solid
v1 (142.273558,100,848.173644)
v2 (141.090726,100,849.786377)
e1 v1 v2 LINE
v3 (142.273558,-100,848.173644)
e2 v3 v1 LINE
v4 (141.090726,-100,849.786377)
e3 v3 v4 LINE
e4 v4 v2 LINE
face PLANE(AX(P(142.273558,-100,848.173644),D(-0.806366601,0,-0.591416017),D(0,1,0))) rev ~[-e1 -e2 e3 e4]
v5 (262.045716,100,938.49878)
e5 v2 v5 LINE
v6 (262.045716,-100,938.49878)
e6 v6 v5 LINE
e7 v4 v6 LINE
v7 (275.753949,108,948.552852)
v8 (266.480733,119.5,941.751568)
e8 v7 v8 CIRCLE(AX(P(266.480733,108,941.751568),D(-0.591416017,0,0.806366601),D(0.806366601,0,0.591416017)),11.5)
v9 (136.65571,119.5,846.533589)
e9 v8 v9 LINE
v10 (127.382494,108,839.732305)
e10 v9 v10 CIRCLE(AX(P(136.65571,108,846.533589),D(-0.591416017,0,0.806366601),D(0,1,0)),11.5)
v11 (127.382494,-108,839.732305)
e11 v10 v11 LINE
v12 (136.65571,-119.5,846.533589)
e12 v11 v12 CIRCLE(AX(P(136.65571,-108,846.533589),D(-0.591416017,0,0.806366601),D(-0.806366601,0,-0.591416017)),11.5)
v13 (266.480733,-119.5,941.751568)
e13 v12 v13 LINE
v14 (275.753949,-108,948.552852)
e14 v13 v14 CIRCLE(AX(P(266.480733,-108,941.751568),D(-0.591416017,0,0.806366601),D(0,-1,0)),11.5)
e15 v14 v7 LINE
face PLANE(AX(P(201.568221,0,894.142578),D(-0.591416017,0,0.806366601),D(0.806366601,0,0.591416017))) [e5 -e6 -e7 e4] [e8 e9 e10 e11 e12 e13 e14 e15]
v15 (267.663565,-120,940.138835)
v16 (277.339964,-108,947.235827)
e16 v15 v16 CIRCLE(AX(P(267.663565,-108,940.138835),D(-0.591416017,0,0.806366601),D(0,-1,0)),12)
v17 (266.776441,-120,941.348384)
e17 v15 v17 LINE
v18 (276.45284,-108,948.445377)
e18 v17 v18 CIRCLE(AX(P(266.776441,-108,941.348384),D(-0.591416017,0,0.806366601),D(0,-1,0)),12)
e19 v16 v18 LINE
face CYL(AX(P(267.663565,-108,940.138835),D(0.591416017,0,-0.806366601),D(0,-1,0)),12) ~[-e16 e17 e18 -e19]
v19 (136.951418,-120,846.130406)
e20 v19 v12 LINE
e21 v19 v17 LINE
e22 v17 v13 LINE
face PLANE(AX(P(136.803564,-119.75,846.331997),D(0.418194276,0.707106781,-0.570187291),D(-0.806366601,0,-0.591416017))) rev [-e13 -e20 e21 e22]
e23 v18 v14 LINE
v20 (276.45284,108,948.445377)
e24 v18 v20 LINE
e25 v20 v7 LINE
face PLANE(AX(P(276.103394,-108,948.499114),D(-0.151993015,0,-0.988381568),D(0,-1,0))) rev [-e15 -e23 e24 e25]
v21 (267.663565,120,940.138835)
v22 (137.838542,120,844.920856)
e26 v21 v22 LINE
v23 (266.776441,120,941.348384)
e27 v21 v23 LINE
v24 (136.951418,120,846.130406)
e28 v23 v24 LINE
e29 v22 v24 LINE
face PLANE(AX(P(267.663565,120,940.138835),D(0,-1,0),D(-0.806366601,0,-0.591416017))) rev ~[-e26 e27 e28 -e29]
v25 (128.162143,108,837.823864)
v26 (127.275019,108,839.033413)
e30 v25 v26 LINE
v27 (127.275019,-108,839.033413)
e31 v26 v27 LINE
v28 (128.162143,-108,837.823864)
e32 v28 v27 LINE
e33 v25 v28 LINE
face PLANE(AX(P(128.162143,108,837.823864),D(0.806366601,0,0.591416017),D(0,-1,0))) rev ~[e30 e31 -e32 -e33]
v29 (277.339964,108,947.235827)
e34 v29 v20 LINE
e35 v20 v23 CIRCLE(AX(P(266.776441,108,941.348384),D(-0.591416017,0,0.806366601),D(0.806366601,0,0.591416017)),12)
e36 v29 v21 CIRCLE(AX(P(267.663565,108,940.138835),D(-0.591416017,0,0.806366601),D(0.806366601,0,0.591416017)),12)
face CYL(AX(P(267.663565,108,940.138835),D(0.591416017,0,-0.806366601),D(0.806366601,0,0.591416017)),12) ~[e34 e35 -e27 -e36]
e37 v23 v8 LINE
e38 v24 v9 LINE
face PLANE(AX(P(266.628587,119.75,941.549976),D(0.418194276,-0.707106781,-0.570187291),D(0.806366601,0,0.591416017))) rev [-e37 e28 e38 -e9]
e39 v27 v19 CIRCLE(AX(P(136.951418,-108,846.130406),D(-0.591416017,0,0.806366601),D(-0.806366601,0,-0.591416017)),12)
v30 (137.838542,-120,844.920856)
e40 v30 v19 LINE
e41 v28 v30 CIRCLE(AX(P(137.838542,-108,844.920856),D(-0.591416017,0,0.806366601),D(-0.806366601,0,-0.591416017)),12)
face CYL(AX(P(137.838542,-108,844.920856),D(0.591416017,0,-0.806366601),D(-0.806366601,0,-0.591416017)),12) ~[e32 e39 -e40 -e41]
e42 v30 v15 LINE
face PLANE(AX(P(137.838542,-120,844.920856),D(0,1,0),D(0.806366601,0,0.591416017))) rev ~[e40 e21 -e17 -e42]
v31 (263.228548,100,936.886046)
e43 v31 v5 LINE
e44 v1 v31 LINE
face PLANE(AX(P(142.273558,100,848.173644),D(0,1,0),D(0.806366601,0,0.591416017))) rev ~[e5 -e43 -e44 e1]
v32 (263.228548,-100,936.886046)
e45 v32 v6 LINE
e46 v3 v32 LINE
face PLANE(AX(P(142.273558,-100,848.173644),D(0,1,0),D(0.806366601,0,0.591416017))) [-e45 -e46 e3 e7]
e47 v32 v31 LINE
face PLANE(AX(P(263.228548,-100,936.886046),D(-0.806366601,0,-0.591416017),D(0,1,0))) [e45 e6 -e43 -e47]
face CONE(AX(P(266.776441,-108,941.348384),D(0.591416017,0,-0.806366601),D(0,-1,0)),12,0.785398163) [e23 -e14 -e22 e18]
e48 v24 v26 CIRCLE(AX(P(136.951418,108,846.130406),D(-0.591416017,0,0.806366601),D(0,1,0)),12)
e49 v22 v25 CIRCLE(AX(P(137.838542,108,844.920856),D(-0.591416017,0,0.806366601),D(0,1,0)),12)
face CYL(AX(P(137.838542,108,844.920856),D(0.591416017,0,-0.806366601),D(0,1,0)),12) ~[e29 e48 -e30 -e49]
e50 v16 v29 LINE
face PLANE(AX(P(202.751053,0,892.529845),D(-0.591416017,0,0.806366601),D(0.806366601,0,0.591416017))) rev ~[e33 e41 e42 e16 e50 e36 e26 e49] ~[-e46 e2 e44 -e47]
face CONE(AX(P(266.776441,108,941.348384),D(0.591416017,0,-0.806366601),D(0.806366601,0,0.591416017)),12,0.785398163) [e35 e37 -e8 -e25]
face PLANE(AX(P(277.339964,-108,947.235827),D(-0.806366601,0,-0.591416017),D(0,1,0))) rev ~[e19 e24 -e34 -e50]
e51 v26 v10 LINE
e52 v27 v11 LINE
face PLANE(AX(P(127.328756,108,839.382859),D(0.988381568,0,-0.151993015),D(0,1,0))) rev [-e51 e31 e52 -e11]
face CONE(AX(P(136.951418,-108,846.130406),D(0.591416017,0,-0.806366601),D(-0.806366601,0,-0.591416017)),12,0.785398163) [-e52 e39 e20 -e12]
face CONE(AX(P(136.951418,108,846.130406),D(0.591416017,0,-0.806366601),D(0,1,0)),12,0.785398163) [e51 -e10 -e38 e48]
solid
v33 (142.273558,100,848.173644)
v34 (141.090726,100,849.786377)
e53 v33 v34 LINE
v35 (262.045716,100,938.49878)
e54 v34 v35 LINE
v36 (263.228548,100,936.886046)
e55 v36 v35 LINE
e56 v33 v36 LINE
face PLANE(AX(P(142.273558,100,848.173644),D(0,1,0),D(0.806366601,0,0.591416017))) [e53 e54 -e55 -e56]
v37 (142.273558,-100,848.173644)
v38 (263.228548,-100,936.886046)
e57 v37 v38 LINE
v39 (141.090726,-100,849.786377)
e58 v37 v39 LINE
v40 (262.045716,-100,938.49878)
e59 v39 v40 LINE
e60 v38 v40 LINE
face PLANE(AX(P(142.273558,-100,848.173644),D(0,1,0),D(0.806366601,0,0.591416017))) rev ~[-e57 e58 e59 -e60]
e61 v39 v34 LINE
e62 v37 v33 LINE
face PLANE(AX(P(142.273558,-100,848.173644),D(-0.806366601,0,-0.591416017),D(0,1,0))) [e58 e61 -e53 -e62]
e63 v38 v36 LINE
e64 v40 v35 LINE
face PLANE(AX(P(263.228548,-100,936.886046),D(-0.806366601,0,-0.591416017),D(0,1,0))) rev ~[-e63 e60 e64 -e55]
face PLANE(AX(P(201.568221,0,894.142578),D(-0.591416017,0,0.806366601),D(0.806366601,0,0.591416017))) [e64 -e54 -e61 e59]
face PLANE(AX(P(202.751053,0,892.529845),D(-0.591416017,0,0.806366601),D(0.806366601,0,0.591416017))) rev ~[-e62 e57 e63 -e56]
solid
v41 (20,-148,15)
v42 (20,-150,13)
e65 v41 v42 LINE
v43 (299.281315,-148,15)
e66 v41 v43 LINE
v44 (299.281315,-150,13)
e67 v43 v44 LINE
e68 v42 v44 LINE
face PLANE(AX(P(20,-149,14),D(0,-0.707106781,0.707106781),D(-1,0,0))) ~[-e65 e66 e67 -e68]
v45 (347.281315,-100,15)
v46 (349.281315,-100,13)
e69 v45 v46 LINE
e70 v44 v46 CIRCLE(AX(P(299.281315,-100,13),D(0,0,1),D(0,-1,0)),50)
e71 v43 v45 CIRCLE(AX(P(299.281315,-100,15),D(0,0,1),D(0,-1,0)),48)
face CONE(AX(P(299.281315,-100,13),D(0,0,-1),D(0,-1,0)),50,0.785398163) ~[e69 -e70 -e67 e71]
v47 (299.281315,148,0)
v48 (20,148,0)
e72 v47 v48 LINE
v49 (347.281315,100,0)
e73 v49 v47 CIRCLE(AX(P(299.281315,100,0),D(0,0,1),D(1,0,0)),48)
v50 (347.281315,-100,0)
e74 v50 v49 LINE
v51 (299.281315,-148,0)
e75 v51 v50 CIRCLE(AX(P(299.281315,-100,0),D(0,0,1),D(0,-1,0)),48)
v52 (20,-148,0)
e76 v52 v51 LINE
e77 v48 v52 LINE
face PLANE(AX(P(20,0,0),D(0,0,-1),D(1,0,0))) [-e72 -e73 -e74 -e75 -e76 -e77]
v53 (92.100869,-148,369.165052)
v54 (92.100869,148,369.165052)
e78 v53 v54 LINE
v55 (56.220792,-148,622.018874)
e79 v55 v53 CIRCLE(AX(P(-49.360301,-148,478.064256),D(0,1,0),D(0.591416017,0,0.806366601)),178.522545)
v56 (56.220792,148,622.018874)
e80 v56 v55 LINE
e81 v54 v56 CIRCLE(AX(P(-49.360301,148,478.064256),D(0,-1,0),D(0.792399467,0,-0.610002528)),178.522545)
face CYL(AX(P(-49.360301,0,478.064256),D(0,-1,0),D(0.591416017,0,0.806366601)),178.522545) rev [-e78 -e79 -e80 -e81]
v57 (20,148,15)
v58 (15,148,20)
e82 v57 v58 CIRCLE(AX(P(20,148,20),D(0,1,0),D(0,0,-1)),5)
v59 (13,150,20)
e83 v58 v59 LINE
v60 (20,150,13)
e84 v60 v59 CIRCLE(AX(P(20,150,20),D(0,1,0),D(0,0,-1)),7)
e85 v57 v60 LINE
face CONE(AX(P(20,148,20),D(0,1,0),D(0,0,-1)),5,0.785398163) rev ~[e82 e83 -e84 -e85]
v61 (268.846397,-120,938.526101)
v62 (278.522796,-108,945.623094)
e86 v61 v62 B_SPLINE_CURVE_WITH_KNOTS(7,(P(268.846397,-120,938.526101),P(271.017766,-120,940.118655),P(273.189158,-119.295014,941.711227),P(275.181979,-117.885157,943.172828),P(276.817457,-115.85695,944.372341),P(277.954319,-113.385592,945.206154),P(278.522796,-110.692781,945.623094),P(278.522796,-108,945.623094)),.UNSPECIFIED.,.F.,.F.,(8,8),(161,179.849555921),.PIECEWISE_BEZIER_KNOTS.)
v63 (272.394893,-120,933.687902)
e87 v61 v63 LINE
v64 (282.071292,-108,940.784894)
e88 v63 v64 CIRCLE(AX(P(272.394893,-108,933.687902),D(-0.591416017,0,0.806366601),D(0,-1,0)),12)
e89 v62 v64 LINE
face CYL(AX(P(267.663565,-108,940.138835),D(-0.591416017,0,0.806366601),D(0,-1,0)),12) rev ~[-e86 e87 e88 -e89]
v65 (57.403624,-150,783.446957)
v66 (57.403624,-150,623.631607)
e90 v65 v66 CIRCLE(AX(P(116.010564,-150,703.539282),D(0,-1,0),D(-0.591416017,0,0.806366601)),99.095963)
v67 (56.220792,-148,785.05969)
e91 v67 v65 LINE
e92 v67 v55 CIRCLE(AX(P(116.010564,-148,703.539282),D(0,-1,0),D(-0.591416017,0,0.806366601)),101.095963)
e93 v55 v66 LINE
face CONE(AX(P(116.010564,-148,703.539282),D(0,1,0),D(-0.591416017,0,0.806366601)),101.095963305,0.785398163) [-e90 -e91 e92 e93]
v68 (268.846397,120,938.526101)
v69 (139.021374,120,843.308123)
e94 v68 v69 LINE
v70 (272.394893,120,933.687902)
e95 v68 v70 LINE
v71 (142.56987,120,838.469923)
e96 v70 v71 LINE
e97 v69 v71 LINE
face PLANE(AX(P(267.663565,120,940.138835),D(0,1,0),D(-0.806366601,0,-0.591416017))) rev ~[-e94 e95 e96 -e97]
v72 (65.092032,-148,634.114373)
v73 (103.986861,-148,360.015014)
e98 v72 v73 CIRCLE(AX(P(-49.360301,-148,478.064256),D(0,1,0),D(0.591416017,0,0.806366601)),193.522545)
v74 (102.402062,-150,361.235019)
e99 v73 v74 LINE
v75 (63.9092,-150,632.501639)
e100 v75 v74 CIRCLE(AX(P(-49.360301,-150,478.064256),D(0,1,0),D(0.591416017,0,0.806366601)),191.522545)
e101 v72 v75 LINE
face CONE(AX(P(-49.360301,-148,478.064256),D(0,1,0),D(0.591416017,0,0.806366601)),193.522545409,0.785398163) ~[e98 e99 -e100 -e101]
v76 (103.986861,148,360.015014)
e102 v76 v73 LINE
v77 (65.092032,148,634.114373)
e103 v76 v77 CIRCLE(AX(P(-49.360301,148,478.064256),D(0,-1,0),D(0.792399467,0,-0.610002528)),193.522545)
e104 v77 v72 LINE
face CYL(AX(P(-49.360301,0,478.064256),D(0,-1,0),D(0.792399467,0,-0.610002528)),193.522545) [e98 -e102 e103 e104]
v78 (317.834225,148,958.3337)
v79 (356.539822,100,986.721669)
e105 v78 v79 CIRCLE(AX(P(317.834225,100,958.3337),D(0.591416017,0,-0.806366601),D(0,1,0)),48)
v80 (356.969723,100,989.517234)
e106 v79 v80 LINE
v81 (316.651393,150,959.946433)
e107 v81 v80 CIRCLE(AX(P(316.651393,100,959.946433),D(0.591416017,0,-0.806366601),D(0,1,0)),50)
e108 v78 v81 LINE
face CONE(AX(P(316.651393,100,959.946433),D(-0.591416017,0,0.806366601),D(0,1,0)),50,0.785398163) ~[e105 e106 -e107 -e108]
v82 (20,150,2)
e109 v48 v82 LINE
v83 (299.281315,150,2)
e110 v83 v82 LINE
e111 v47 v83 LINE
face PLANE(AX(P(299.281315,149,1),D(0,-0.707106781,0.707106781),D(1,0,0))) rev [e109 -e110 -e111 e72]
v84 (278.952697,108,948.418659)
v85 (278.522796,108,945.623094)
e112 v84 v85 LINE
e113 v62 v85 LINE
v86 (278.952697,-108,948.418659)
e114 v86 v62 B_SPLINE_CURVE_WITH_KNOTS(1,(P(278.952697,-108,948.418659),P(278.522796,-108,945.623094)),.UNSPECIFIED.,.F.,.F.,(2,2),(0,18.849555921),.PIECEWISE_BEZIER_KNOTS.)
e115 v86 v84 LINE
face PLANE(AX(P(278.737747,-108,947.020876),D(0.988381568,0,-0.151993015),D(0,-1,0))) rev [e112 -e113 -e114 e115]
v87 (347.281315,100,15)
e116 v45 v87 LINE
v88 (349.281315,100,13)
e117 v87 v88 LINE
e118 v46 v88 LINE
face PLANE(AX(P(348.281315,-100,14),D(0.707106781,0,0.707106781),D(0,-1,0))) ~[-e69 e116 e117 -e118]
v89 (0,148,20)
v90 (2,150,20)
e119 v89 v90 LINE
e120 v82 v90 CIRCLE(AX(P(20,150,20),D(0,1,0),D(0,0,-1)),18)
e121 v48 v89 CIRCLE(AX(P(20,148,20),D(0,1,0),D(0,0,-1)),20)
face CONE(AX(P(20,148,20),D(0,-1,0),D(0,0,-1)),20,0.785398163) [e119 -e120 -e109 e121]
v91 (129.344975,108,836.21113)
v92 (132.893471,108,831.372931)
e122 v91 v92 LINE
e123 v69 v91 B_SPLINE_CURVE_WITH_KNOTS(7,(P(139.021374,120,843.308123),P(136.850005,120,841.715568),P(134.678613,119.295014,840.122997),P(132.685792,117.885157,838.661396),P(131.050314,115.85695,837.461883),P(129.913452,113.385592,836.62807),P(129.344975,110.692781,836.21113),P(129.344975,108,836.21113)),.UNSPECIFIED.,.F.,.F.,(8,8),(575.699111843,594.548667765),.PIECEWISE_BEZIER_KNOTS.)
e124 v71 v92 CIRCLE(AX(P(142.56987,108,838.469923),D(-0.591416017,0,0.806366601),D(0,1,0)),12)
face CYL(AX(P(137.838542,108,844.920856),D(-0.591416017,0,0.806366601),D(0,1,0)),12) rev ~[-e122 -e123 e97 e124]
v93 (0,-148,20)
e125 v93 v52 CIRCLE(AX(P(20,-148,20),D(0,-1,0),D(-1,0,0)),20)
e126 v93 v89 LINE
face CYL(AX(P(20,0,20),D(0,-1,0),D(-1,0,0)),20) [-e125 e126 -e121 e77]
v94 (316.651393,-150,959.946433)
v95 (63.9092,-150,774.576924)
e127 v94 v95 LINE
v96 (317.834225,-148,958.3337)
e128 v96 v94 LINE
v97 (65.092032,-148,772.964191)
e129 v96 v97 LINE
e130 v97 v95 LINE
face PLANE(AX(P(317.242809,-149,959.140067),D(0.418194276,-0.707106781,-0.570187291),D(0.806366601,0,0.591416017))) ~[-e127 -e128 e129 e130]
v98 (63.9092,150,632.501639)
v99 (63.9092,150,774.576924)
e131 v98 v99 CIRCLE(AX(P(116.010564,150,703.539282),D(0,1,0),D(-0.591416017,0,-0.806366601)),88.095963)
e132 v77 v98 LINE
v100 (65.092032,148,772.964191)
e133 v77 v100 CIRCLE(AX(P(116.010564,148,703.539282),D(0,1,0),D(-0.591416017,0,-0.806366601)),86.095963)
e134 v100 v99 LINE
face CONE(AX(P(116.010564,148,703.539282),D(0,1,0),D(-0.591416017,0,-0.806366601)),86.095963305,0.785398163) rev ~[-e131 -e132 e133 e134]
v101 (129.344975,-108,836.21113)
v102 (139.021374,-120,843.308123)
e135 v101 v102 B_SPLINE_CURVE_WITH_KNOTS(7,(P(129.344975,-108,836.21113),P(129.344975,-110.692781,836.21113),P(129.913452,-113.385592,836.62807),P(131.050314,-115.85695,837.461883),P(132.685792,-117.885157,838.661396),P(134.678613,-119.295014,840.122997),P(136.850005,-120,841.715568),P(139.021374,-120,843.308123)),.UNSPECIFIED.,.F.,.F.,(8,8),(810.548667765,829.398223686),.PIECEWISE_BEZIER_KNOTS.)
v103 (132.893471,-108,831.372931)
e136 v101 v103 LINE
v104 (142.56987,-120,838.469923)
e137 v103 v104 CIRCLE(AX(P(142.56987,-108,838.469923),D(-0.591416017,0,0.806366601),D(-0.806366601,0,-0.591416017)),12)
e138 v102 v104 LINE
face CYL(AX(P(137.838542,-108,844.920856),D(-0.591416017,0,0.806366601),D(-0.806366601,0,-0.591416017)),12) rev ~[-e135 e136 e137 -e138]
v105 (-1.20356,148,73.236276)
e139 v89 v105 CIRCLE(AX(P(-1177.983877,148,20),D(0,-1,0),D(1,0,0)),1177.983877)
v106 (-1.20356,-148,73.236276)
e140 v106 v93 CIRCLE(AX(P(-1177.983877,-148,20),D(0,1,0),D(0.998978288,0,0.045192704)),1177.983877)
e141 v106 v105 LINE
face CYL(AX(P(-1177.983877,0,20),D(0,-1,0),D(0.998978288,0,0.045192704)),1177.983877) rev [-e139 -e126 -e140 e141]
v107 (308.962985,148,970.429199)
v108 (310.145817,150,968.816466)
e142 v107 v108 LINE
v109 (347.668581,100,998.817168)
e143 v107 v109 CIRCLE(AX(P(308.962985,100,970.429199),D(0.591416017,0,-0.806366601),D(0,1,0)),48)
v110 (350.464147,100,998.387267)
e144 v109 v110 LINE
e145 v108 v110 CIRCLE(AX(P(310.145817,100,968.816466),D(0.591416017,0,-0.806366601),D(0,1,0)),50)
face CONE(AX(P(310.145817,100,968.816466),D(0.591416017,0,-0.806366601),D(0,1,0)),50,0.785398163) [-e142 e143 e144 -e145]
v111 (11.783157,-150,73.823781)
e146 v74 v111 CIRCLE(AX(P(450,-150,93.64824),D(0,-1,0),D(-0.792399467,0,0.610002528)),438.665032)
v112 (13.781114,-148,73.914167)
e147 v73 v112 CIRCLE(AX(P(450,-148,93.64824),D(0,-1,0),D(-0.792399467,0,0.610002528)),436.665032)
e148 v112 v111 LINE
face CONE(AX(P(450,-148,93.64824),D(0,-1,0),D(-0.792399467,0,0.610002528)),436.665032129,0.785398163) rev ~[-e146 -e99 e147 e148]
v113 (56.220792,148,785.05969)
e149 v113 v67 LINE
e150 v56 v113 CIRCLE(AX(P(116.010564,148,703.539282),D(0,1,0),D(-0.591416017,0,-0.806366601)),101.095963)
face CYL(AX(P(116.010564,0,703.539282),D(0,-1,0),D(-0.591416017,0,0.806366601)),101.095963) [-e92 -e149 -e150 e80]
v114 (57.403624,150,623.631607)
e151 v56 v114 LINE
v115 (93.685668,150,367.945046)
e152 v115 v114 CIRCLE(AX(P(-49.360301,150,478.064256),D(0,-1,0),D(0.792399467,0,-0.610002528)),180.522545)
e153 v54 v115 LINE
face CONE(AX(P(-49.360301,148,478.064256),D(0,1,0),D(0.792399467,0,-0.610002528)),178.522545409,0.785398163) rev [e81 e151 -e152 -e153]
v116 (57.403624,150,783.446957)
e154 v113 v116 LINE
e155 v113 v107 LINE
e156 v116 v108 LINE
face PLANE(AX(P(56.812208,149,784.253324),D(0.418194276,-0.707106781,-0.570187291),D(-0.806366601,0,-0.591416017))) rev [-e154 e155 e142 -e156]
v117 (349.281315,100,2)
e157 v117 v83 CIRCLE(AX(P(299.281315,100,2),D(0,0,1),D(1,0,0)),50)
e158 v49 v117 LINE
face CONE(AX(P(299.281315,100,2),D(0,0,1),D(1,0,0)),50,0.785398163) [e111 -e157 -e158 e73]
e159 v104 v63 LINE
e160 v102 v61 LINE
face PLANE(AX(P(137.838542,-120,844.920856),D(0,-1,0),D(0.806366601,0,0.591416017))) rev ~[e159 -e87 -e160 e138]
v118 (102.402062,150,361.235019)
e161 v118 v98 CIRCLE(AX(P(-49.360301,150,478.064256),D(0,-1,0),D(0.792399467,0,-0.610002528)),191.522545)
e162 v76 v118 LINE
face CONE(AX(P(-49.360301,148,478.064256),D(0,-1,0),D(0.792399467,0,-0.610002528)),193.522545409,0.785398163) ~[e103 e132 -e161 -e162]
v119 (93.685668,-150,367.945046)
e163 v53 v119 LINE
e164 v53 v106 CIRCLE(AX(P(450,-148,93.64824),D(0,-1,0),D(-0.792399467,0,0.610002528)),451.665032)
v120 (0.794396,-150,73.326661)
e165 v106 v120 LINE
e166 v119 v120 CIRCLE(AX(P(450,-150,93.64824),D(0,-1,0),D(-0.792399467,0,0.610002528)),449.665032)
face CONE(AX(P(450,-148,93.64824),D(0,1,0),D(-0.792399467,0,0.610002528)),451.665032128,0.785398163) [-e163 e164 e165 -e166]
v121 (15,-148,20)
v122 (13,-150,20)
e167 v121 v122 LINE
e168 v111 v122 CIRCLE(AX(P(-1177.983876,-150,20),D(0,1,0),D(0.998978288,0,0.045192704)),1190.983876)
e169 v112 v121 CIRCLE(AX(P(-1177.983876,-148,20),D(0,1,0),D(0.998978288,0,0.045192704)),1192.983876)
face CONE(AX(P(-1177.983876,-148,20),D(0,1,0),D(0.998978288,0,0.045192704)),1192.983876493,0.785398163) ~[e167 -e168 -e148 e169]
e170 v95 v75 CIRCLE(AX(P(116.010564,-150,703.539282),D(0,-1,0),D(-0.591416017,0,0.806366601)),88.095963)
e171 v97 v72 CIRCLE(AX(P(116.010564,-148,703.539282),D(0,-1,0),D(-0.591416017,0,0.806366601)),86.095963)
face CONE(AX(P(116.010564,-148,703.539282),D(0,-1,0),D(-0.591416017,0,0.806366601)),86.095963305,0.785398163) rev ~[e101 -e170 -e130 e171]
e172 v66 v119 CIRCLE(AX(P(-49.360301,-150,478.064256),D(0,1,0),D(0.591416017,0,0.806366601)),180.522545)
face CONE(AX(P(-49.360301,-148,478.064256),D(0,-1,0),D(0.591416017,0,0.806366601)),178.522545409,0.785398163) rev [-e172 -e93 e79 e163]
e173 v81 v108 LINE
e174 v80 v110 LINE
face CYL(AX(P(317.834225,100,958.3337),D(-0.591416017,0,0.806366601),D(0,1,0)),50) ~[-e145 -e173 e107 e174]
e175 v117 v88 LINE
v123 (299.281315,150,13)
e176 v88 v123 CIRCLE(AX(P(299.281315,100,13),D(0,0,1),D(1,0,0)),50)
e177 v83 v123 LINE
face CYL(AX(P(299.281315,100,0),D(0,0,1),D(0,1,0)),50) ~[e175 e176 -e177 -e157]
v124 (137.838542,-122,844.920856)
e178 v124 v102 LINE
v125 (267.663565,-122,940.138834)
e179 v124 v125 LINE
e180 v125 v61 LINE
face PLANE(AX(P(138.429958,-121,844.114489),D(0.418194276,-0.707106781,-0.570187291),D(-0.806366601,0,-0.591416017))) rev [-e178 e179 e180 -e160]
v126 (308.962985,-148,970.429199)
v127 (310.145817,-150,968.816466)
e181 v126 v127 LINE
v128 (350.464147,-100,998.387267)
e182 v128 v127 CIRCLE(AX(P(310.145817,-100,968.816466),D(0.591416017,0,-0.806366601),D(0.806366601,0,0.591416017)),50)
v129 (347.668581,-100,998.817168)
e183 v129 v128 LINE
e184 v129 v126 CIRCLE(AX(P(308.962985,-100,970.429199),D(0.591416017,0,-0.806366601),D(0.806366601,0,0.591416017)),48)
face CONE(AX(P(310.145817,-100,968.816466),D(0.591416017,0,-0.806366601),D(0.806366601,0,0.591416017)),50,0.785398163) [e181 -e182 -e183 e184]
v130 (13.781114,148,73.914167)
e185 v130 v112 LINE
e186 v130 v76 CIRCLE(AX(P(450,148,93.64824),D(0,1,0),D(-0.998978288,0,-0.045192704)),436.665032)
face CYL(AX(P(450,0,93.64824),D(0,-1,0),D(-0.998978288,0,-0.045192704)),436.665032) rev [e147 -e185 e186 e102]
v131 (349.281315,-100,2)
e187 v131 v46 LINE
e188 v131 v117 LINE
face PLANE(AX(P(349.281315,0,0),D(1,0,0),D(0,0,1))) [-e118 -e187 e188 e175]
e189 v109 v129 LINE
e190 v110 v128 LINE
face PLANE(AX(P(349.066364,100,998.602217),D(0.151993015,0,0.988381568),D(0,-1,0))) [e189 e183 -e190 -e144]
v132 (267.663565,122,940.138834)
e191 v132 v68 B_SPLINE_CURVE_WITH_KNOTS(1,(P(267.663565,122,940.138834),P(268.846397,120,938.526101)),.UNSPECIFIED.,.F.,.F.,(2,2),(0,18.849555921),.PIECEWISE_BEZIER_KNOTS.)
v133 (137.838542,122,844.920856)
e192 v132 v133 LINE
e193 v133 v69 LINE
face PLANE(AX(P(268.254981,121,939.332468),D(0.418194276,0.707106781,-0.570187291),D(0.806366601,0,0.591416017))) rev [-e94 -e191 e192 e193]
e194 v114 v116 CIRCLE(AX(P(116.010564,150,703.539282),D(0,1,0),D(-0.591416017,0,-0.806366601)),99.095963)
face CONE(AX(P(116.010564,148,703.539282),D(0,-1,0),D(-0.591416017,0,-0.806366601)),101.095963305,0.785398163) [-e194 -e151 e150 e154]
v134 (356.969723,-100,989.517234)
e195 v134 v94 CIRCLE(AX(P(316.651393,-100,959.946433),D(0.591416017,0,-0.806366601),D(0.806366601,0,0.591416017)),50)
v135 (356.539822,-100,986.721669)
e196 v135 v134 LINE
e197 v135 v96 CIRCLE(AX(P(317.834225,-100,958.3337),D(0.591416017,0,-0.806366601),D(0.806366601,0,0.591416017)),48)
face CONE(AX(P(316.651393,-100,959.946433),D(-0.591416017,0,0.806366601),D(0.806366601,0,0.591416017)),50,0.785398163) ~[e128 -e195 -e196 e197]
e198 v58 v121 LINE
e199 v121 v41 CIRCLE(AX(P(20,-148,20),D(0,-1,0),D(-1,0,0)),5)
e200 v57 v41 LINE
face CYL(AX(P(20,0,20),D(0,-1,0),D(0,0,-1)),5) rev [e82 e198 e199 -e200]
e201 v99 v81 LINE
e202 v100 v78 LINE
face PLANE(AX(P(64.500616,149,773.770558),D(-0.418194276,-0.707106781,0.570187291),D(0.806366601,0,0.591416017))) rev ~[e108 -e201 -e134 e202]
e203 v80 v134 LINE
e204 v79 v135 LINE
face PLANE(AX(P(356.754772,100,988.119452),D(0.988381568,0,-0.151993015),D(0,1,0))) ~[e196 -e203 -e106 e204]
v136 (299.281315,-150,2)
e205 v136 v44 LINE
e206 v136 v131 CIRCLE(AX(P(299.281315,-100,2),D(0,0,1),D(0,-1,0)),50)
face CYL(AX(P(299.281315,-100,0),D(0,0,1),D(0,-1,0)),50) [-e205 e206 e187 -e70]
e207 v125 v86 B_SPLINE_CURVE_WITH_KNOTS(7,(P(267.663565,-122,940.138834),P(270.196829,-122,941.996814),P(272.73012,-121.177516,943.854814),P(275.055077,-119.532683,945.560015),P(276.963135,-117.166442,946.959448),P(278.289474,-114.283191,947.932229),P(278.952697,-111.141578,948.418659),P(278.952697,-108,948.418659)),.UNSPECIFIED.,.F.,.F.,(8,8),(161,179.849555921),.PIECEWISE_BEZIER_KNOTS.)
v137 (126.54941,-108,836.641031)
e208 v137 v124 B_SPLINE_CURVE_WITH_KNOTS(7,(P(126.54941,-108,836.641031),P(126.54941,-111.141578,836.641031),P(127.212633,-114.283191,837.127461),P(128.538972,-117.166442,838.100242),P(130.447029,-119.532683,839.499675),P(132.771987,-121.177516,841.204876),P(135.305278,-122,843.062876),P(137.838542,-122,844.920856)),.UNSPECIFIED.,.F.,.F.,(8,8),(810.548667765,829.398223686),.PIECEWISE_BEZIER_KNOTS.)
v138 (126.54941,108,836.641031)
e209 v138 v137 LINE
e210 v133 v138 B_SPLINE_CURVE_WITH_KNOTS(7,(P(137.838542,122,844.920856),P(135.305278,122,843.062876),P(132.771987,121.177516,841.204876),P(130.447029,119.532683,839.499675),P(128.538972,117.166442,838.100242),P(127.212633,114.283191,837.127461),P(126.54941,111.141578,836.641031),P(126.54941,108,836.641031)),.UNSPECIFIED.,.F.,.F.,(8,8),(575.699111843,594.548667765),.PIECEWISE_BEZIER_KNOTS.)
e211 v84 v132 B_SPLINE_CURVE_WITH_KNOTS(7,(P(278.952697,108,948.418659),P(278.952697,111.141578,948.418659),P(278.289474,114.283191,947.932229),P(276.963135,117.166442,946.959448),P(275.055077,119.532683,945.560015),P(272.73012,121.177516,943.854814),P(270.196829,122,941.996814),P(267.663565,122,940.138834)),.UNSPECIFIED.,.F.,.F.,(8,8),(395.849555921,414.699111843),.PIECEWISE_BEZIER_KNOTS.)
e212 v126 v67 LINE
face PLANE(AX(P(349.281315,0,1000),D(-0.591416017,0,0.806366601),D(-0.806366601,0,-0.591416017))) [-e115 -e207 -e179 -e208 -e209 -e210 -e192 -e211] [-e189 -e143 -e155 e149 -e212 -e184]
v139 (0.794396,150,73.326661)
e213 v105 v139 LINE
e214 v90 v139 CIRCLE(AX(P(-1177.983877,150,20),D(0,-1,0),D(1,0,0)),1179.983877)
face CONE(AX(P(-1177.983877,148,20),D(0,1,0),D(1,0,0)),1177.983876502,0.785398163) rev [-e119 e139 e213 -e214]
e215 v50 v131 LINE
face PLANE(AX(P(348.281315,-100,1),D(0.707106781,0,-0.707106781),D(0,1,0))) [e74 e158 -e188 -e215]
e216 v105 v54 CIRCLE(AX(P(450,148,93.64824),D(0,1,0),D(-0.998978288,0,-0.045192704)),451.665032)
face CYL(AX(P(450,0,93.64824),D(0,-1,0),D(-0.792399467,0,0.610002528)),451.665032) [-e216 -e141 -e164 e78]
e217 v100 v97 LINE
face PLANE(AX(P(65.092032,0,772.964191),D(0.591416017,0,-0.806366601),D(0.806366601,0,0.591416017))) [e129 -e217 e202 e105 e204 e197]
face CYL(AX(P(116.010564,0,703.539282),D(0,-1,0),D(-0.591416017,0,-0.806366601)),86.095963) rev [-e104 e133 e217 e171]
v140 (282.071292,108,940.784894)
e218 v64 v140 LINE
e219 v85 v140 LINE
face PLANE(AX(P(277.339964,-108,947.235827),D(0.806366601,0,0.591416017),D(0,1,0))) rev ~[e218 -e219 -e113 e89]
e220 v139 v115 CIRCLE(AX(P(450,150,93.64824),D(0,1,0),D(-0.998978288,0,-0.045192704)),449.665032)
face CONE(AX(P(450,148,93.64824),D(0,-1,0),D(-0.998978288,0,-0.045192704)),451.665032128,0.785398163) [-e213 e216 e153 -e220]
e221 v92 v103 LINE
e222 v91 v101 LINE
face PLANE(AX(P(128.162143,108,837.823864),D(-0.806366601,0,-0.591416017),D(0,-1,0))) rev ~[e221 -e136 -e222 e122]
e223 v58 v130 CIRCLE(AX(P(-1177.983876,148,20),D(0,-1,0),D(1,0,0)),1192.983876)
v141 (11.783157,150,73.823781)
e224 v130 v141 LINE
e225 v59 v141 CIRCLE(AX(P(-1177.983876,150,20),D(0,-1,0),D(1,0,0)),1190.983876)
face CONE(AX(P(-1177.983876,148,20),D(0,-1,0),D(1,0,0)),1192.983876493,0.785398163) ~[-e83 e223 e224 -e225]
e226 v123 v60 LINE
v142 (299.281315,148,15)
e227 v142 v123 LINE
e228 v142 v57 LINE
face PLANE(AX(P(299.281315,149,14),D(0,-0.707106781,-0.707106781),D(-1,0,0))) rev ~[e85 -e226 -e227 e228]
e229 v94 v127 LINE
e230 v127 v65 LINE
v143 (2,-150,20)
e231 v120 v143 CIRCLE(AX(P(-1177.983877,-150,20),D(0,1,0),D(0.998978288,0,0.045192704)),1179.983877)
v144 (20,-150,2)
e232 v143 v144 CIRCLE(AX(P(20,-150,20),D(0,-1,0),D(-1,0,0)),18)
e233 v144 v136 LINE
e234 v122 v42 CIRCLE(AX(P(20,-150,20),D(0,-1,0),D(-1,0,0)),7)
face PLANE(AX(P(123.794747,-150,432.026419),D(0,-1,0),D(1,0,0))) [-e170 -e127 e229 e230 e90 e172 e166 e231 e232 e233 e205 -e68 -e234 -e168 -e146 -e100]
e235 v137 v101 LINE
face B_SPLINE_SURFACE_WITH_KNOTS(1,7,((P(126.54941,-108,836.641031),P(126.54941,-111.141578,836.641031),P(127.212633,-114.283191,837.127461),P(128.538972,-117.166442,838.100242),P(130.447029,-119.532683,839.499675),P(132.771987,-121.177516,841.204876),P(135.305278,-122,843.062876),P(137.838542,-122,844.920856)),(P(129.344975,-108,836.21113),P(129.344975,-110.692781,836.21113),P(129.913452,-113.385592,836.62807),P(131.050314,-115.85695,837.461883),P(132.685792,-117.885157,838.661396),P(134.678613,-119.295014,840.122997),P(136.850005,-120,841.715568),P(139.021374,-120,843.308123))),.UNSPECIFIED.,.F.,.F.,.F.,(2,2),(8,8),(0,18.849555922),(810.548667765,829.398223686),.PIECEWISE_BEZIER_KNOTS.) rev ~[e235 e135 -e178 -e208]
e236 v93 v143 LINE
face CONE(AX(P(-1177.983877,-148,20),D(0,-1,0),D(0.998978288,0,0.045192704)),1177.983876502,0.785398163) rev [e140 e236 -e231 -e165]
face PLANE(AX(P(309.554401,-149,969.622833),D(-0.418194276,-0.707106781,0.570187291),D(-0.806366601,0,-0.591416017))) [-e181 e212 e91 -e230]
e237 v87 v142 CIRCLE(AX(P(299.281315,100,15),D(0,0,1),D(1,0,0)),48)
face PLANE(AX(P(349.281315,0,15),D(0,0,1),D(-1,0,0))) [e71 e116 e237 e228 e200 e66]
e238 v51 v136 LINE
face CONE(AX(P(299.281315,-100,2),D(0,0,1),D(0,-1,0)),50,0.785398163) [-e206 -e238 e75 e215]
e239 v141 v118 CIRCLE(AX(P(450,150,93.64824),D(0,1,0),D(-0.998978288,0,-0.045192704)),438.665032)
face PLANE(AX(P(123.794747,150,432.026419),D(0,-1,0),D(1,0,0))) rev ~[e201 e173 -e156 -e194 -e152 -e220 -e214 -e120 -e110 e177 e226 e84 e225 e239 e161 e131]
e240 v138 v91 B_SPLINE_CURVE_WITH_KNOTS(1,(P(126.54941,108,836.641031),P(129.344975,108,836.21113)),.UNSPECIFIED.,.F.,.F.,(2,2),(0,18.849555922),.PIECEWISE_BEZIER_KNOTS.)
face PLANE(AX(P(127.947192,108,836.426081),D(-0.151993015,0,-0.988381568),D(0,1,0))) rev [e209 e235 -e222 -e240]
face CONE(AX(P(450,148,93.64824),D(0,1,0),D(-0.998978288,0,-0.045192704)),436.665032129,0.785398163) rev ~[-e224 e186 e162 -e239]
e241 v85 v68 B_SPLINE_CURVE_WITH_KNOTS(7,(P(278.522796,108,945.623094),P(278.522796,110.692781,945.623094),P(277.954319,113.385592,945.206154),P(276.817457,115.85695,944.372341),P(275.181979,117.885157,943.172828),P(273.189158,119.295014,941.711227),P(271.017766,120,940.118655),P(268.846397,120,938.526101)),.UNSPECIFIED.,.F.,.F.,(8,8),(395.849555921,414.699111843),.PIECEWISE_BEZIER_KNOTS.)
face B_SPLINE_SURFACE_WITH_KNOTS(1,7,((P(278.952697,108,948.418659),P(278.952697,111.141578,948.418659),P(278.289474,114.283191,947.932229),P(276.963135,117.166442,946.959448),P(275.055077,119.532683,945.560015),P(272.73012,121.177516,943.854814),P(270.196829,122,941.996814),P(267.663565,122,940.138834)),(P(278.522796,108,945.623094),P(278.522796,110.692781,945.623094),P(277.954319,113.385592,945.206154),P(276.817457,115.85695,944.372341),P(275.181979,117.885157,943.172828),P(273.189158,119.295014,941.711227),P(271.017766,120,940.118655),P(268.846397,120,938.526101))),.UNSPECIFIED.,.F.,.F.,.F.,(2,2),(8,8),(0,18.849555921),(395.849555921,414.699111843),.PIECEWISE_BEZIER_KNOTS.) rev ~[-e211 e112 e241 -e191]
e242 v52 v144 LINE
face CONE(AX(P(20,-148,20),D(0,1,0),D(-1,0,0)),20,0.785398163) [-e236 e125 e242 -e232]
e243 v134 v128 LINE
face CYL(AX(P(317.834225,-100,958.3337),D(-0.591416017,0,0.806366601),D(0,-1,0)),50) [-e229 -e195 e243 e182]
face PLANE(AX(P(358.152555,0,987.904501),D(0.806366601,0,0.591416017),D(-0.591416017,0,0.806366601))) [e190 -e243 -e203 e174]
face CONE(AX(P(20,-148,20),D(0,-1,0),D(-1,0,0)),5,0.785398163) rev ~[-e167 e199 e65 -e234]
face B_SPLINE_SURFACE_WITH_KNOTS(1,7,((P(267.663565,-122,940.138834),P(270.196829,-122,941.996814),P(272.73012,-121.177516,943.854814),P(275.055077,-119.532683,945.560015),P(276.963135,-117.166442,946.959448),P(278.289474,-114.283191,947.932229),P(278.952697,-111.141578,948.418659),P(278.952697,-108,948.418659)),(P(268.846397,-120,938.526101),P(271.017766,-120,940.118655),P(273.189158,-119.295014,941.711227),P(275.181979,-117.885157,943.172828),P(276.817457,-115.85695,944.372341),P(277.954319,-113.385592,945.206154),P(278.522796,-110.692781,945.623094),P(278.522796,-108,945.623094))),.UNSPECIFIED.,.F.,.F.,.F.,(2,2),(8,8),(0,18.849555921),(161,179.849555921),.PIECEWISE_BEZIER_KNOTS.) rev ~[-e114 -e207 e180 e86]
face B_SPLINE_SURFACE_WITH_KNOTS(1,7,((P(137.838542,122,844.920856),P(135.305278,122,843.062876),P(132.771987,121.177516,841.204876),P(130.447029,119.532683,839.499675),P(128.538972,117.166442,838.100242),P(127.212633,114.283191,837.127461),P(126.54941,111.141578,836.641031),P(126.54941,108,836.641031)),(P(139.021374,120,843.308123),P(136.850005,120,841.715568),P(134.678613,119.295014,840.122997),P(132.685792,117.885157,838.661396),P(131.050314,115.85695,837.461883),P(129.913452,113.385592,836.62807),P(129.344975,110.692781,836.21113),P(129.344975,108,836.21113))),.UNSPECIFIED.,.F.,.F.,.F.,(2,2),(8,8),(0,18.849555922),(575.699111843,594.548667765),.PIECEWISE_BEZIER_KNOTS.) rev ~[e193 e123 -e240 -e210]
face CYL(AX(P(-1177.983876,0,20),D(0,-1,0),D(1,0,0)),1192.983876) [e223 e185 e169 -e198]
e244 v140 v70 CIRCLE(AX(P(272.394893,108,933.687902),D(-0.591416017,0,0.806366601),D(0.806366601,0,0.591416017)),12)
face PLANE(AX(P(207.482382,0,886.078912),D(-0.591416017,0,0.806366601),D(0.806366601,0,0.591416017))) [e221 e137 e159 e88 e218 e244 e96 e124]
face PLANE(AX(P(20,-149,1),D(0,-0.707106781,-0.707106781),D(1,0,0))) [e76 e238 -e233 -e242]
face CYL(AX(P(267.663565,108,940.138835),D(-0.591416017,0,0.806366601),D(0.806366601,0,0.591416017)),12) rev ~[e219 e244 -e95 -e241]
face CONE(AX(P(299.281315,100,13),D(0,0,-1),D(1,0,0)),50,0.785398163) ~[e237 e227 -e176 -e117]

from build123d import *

# Parameters (mm, degrees)
F1_DEPTH = 150
F2_W     = 150
F2_H     = 200
F3_DEPTH = 8
F4_DEPTH = 2
F5_DEPTH = 2
F6_SIZE  = 0.5
F7_R     = 50
F8_SIZE  = 2


with BuildPart() as f1:
    # F0 (on Front) → F1 (new body, symmetric)
    with BuildSketch(Plane.XZ):
        with BuildLine():
            ThreePointArc((0, 20), (5.8578643763, 5.8578643763), (20, 0))
            Line((20, 0), (349.2813145287, 0))
            Line((349.2813145287, 0), (349.2813145287, 15))
            Line((349.2813145287, 15), (20, 15))
            ThreePointArc((20, 15), (16.4644660941, 16.4644660941), (15, 20))
            ThreePointArc((15, 20), (14.6952395355, 46.9639715527), (13.7811138505, 73.9141666367))
            ThreePointArc((13.7811138505, 73.9141666367), (33.5445295719, 224.9539574175), (103.9868612693, 360.0150136294))
            ThreePointArc((103.9868612693, 360.0150136294), (142.242823173, 505.2528295697), (65.0920324936, 634.1143726997))
            ThreePointArc((65.0920324936, 634.1143726997), (29.9146009128, 703.5392819502), (65.0920324936, 772.9641912008))
            Line((65.0920324936, 772.9641912008), (358.1525547883, 987.9045009919))
            Line((358.1525547883, 987.9045009919), (349.2813145287, 1000))
            Line((349.2813145287, 1000), (56.2207922339, 785.0596902089))
            ThreePointArc((56.2207922339, 785.0596902089), (14.9146009128, 703.5392819502), (56.2207922339, 622.0188736916))
            ThreePointArc((56.2207922339, 622.0188736916), (127.3915982157, 503.1454337196), (92.1008692639, 369.1650515553))
            ThreePointArc((92.1008692639, 369.1650515553), (19.2387537556, 229.4644760457), (-1.2035604669, 73.236276084))
            ThreePointArc((-1.2035604669, 73.236276084), (-0.3009285544, 46.624939667), (0, 20))
        make_face()
    extrude(amount=F1_DEPTH, both=True)

    # F2 (on face) → F3 (cut)
    with BuildSketch(Plane(origin=(-354.7289831539, 0, 483.6554910394), x_dir=(0.8063666005, 0, 0.5914160173), z_dir=(-0.5914160173, 0, 0.8063666005))):
        with BuildLine():
            Line((598.8481239922, 108), (598.8481239922, -108))
            ThreePointArc((598.8481239922, -108), (602.3628426179, -116.4852813742), (610.8481239922, -120))
            Line((610.8481239922, -120), (771.8481239922, -120))
            ThreePointArc((771.8481239922, -120), (780.3334053664, -116.4852813742), (783.8481239922, -108))
            Line((783.8481239922, -108), (783.8481239922, 108))
            ThreePointArc((783.8481239922, 108), (780.3334053664, 116.4852813742), (771.8481239922, 120))
            Line((771.8481239922, 120), (610.8481239922, 120))
            ThreePointArc((610.8481239922, 120), (602.3628426179, 116.4852813742), (598.8481239922, 108))
        make_face()
        with Locations((691.3481239922, 0)):
            Rectangle(F2_W, F2_H, mode=Mode.SUBTRACT)
        with Locations((691.3481239922, 0)):
            Rectangle(F2_W, F2_H)
    extrude(amount=-F3_DEPTH, mode=Mode.SUBTRACT)

    # F7
    f7_edges = [f1.edges().sort_by_distance(p)[0] for p in [
        (353.716935, -150, 993.95225),
        (353.716935, 150, 993.95225),
        (349.281315, -150, 7.5),
        (349.281315, 150, 7.5),
    ]]
    fillet(f7_edges, radius=F7_R)

    # F8
    f8_edges = [f1.edges().sort_by_distance(p)[0] for p in [
        (349.281315, 0, 1000),
        (202.751053, -120, 892.529845),
        (358.152555, 0, 987.904501),
    ]]
    chamfer(f8_edges, length=F8_SIZE)


with BuildPart() as f4:
    # F2 (on face) → F4 (new body)
    with BuildSketch(Plane(origin=(-354.7289831539, 0, 483.6554910394), x_dir=(0.8063666005, 0, 0.5914160173), z_dir=(-0.5914160173, 0, 0.8063666005))):
        with BuildLine():
            Line((598.8481239922, 108), (598.8481239922, -108))
            ThreePointArc((598.8481239922, -108), (602.3628426179, -116.4852813742), (610.8481239922, -120))
            Line((610.8481239922, -120), (771.8481239922, -120))
            ThreePointArc((771.8481239922, -120), (780.3334053664, -116.4852813742), (783.8481239922, -108))
            Line((783.8481239922, -108), (783.8481239922, 108))
            ThreePointArc((783.8481239922, 108), (780.3334053664, 116.4852813742), (771.8481239922, 120))
            Line((771.8481239922, 120), (610.8481239922, 120))
            ThreePointArc((610.8481239922, 120), (602.3628426179, 116.4852813742), (598.8481239922, 108))
        make_face()
        with Locations((691.3481239922, 0)):
            Rectangle(F2_W, F2_H, mode=Mode.SUBTRACT)
    extrude(amount=F4_DEPTH)

    # F6
    f6_edges = [f4.edges().sort_by_distance(p)[0] for p in [
        (201.568221, -120, 894.142578),
    ]]
    chamfer(f6_edges, length=F6_SIZE)


with BuildPart() as f5:
    # F2 (on face) → F5 (new body)
    with BuildSketch(Plane(origin=(-354.7289831539, 0, 483.6554910394), x_dir=(0.8063666005, 0, 0.5914160173), z_dir=(-0.5914160173, 0, 0.8063666005))):
        with Locations((691.3481239922, 0)):
            Rectangle(F2_W, F2_H)
    extrude(amount=F5_DEPTH)


solid = Compound([f1.part, f4.part, f5.part])
